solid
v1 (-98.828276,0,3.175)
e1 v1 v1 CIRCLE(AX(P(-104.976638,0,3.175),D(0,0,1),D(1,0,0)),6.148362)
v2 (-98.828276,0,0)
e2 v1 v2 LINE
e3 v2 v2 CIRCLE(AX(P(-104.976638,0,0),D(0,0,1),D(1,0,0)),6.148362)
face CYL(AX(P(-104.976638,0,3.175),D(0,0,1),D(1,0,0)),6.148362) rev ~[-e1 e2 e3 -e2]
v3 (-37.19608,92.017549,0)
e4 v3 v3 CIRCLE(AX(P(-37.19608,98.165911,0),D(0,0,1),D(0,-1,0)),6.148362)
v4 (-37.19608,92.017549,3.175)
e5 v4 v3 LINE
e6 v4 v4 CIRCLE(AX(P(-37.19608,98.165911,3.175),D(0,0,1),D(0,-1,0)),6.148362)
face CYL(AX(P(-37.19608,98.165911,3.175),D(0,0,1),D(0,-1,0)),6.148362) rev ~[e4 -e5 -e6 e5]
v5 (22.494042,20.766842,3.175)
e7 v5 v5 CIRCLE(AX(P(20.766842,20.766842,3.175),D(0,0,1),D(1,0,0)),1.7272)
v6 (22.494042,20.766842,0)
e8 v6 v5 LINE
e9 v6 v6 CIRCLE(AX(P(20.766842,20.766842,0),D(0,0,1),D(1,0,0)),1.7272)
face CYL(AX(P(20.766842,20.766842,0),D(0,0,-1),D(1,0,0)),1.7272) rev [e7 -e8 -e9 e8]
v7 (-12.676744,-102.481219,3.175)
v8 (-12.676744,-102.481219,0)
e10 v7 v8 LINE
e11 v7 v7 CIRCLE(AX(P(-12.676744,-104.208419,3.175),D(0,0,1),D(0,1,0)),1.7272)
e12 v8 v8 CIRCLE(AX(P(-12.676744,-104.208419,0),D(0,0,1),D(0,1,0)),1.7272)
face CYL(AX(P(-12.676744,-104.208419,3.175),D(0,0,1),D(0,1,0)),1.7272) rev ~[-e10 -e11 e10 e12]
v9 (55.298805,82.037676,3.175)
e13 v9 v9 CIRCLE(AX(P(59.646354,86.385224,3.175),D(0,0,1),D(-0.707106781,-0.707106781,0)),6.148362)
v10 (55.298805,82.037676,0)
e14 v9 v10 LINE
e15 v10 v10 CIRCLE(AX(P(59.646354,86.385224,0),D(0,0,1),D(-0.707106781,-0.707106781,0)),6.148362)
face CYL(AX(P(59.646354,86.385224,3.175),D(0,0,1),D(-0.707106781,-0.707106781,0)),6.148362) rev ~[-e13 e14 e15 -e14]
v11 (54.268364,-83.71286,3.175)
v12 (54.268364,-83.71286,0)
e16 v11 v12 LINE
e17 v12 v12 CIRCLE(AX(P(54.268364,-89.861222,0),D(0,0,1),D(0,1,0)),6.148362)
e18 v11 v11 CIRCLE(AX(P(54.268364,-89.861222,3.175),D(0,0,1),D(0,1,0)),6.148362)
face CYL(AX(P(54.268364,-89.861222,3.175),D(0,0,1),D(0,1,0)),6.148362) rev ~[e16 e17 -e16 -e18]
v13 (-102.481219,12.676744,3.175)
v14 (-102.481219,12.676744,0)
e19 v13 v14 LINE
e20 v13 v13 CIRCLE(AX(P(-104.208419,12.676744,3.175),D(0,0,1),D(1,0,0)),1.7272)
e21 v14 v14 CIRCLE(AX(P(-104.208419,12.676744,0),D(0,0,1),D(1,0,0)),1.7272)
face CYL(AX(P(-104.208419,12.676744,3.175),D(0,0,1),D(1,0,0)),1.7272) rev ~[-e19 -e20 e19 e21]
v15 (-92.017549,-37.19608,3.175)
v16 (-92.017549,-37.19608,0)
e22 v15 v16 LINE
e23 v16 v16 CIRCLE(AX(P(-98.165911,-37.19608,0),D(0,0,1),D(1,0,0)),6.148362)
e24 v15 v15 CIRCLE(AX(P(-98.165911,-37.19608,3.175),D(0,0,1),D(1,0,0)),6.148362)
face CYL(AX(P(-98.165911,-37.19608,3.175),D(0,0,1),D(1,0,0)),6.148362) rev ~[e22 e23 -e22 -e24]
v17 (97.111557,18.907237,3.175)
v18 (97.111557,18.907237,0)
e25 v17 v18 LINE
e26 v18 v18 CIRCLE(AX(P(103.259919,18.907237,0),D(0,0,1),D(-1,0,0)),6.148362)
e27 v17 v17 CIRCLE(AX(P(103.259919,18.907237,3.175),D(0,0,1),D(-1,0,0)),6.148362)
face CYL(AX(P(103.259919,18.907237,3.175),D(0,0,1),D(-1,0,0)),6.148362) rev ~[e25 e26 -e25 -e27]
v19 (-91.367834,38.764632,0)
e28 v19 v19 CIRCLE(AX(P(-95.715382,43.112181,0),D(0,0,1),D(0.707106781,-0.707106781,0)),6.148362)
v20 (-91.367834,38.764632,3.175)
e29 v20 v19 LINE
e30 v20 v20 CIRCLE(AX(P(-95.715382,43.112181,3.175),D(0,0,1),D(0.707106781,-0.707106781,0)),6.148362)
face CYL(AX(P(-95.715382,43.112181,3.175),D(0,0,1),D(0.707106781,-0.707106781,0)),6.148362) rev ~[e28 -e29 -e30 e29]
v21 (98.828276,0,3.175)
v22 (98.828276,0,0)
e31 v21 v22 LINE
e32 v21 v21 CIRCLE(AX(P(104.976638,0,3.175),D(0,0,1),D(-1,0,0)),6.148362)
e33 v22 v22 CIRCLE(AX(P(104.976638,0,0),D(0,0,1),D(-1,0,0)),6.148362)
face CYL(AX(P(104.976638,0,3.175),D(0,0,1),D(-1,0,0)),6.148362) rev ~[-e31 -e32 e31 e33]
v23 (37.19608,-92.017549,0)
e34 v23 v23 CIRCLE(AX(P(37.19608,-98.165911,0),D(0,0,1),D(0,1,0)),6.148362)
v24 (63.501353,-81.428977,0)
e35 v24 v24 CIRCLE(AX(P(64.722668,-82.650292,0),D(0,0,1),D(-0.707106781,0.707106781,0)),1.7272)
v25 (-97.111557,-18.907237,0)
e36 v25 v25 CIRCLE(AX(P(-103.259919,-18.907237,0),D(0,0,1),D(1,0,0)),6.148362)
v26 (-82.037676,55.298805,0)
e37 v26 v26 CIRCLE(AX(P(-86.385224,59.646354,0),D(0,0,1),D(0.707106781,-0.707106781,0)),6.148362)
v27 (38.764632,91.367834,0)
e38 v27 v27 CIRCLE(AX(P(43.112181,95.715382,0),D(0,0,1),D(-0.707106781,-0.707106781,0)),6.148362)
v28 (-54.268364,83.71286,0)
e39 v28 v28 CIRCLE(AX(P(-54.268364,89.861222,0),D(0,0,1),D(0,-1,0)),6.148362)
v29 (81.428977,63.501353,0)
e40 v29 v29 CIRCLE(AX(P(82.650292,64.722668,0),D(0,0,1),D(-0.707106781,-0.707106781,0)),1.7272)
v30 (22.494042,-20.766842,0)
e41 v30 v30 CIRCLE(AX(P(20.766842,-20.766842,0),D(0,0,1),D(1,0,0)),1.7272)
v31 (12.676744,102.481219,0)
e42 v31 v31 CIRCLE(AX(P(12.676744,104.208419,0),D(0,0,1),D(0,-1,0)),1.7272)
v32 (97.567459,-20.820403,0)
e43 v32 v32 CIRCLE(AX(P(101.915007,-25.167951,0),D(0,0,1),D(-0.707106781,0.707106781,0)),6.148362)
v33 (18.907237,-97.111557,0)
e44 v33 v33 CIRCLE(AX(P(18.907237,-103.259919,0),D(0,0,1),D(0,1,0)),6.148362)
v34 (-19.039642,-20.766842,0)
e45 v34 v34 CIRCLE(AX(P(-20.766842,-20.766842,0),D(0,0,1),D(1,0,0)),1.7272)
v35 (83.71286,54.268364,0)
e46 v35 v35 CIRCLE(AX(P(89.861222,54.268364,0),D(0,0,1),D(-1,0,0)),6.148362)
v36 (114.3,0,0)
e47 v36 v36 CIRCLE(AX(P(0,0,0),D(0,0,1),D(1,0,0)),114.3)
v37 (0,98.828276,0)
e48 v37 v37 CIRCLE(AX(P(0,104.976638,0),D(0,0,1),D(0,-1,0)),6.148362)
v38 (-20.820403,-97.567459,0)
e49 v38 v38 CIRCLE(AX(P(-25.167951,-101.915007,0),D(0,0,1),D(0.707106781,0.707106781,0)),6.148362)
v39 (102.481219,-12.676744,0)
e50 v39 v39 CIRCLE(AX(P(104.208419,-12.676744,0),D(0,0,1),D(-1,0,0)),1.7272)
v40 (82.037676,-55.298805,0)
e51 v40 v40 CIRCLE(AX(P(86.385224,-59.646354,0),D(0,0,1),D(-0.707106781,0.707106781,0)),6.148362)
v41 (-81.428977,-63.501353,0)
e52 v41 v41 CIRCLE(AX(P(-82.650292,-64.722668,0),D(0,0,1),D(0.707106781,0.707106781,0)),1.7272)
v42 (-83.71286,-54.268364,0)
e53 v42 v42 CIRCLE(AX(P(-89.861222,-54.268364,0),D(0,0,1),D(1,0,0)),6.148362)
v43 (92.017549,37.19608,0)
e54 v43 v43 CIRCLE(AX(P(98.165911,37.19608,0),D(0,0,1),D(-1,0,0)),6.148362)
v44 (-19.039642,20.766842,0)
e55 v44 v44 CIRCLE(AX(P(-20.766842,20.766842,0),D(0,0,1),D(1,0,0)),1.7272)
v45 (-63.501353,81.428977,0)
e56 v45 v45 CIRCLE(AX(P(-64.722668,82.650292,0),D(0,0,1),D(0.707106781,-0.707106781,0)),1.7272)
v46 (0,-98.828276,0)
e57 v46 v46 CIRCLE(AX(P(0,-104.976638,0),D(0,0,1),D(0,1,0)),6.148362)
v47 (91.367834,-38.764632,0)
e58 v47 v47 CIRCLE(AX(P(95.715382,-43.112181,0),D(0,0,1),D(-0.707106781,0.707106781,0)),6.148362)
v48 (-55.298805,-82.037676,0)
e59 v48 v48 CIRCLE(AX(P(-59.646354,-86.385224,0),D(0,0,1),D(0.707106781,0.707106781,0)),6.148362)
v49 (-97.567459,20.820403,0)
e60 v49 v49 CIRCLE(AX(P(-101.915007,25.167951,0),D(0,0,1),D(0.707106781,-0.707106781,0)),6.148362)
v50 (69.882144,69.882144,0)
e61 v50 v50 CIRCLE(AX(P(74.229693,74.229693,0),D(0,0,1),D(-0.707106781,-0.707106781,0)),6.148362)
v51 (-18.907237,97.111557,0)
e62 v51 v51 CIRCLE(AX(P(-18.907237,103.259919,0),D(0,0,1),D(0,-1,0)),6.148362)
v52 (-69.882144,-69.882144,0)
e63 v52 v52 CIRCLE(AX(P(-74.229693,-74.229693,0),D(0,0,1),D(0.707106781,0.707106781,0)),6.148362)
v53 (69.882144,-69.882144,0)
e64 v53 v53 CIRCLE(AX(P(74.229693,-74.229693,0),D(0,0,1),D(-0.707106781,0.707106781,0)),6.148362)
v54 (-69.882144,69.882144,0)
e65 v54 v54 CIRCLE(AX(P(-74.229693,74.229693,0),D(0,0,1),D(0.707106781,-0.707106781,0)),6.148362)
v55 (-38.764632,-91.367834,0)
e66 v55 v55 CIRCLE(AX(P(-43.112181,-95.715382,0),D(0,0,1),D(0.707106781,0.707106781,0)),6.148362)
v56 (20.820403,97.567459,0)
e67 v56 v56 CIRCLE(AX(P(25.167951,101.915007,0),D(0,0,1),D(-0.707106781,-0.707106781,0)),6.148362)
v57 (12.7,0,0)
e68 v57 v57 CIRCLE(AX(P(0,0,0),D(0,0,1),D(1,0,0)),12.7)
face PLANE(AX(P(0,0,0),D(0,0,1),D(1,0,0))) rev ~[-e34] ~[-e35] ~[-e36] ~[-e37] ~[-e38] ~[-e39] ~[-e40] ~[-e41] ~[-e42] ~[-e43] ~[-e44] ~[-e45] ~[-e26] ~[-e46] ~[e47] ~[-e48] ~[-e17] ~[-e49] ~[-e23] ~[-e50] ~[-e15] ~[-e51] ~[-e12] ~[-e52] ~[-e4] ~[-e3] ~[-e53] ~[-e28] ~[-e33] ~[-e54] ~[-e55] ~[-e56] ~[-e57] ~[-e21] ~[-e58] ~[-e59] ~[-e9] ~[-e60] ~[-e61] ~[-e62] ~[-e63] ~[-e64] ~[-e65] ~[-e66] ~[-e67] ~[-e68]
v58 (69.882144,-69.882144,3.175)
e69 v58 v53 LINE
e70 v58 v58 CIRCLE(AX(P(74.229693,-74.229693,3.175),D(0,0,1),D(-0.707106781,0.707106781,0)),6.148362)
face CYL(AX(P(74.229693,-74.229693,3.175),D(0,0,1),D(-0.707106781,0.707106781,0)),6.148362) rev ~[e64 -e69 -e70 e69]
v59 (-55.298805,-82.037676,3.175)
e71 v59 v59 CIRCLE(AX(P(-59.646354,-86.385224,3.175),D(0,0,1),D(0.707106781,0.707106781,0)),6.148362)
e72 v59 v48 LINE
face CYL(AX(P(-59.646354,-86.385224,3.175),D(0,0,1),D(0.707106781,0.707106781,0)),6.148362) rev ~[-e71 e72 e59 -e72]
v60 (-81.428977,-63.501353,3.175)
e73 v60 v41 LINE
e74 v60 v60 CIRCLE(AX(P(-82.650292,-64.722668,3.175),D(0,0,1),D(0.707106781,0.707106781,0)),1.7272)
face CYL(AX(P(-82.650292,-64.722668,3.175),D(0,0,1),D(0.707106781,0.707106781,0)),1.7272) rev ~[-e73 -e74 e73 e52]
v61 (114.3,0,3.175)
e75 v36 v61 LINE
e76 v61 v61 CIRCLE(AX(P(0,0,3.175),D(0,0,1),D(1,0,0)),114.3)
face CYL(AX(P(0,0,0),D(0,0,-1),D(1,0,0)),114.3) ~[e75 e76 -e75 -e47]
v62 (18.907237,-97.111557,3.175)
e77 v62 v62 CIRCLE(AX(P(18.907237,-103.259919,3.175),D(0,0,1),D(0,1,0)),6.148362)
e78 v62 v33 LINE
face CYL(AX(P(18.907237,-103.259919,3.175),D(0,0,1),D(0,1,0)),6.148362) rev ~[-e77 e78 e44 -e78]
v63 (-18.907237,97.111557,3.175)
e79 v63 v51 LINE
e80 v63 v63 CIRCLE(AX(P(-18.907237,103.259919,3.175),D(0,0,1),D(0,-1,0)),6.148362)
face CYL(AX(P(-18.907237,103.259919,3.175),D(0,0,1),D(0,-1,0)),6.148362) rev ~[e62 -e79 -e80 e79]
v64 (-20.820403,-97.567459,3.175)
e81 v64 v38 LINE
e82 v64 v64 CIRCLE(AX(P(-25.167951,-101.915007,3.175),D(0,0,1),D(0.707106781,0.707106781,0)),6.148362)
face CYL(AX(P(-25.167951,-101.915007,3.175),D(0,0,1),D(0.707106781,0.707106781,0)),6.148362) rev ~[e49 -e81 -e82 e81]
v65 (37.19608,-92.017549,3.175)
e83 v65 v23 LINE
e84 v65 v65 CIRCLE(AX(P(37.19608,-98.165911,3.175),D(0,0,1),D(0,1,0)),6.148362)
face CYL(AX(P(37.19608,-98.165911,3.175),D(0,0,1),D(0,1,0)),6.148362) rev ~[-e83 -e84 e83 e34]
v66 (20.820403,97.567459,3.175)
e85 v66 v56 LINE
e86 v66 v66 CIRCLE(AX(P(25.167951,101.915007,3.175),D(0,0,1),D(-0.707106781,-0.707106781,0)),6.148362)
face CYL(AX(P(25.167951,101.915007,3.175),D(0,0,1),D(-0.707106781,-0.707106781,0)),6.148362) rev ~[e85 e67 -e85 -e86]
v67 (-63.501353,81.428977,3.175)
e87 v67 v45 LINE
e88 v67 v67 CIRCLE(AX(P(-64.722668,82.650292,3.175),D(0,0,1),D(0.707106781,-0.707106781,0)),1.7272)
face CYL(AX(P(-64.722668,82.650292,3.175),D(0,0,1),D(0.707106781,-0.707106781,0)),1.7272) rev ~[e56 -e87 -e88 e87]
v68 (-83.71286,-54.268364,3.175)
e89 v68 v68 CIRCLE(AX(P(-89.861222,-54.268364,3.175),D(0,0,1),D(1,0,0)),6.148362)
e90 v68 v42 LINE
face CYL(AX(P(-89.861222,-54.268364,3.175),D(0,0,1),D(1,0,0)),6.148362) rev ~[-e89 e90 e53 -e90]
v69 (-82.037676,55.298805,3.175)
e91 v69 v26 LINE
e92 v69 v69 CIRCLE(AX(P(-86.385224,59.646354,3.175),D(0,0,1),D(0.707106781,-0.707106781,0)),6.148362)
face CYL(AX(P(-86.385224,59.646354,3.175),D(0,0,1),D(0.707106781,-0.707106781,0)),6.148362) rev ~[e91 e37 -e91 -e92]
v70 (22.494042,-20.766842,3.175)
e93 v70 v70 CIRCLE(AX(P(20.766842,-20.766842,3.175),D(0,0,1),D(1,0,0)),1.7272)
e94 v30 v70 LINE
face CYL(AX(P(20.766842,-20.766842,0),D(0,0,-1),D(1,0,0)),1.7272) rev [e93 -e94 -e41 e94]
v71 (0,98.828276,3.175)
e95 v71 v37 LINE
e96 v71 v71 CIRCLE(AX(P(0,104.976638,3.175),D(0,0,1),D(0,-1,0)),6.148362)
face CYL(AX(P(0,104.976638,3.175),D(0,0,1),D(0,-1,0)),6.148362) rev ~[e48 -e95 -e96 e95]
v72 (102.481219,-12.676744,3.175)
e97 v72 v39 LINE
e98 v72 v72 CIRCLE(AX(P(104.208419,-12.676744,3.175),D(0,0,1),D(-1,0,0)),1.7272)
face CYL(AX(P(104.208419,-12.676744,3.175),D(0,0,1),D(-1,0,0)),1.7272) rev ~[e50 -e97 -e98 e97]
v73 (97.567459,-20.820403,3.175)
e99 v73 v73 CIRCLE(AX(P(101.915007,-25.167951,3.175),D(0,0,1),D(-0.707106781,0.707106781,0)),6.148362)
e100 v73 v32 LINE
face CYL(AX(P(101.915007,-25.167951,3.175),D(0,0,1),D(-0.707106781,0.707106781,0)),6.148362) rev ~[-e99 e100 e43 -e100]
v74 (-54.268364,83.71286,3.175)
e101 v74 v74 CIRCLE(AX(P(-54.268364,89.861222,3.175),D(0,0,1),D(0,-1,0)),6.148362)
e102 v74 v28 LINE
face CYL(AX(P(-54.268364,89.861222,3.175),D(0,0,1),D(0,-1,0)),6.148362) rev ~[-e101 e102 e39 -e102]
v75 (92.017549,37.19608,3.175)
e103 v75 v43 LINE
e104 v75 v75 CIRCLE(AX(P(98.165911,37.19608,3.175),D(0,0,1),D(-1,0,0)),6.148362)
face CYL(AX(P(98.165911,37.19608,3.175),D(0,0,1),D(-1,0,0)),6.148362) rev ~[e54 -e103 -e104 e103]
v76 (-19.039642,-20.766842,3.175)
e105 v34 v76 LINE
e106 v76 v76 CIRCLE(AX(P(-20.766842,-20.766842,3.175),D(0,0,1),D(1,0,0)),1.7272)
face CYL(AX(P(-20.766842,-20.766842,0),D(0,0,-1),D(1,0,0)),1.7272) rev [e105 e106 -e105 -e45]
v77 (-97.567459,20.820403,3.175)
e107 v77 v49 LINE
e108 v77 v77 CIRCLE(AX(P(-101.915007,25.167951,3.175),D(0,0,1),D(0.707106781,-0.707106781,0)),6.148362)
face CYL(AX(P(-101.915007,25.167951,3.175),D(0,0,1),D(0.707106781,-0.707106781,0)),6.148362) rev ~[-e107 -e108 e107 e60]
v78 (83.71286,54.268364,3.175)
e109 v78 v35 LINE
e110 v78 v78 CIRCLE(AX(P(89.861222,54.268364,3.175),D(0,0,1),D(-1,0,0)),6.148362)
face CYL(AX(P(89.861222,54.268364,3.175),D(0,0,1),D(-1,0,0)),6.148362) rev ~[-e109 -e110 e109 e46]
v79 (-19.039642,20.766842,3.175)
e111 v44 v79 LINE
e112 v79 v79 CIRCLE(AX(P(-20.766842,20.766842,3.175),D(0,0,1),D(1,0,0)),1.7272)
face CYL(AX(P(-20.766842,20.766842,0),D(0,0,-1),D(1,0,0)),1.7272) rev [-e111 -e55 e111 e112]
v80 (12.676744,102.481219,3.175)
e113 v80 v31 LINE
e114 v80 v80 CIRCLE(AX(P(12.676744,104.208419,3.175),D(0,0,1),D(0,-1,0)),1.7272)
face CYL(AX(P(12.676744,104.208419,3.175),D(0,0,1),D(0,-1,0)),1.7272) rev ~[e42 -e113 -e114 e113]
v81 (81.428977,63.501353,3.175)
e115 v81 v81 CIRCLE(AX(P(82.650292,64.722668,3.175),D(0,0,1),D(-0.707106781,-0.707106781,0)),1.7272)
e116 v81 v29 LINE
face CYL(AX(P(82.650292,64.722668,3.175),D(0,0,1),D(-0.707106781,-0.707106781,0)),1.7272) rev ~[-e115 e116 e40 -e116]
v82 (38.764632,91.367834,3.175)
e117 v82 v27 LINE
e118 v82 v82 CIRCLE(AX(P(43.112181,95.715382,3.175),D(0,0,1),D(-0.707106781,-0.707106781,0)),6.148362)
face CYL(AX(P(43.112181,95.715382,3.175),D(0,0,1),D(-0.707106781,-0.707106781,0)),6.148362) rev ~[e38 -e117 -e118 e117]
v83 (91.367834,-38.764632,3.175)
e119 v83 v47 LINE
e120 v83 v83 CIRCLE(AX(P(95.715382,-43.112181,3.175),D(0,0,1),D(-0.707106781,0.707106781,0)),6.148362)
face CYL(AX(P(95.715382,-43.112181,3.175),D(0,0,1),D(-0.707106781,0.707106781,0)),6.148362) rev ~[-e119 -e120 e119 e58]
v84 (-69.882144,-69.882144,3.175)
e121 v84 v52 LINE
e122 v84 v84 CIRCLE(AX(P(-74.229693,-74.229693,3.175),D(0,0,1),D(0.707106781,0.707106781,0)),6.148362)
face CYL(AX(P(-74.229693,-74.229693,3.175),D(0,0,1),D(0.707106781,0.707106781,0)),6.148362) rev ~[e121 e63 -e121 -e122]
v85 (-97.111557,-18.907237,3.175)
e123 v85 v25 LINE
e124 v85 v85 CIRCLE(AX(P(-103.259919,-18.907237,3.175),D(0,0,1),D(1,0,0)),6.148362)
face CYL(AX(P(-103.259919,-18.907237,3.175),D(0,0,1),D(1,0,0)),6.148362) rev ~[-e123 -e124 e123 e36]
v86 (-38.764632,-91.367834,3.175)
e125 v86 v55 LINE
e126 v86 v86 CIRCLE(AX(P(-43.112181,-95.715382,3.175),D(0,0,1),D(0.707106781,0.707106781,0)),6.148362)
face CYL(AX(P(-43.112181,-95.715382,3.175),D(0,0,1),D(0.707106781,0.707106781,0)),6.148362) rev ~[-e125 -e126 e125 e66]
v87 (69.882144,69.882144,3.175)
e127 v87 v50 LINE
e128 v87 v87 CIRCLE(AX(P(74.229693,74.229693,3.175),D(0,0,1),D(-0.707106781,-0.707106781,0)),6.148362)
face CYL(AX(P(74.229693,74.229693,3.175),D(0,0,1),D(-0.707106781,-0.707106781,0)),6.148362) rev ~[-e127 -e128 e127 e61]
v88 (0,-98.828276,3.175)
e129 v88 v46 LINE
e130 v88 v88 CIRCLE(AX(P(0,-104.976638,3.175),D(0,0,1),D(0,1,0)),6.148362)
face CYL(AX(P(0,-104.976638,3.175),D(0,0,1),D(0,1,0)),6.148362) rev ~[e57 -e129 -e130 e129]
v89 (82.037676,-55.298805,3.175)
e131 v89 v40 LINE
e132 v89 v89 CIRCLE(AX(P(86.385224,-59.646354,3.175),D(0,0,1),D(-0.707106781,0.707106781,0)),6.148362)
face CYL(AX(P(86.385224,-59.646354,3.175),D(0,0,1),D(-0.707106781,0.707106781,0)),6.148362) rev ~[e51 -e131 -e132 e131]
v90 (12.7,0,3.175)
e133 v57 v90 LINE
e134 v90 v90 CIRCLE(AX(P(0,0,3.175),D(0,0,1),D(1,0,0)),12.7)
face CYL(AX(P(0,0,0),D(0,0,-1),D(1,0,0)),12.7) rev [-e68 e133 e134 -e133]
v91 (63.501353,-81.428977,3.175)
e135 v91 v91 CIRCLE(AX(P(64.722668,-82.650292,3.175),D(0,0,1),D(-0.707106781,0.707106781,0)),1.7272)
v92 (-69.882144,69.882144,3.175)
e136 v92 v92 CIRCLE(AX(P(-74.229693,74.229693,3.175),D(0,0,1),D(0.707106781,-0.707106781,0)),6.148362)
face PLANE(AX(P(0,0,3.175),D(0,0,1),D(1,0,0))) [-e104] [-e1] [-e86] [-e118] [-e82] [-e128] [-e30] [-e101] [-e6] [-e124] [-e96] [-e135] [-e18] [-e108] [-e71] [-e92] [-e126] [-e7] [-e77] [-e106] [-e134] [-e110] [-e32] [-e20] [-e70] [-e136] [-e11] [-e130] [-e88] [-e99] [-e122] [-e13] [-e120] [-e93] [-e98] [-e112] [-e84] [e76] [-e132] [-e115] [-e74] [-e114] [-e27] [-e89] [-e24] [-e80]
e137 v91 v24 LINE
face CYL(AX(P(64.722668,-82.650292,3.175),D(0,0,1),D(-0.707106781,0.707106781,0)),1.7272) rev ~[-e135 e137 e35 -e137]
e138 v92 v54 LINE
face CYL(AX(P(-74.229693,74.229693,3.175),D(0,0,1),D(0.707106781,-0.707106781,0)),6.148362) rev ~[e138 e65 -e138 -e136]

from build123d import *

# Parameters (mm, degrees)
F0_R            = 114.3
F0_R_2          = 1.7272
F0_R_3          = 12.7
F1_DEPTH        = 3.175
F2_R            = 6.1483621
F2_R_2          = 1.7272
F3_DEPTH        = 3.175
F3_COPIES_COUNT = 8


# Not quite as in the source:
# - a pattern or mirror of a feature is missing from the dataset's text; its kind, count and spacing are read off the source's solid


with BuildPart() as f1:
    # F0 (on Top) → F1 (new body)
    with BuildSketch(Plane.XY):
        Circle(F0_R)
        with Locations((-20.76684228, -20.76684228)):
            Circle(F0_R_2, mode=Mode.SUBTRACT)
        with Locations((20.76684228, -20.76684228)):
            Circle(F0_R_2, mode=Mode.SUBTRACT)
        with Locations((-20.76684228, 20.76684228)):
            Circle(F0_R_2, mode=Mode.SUBTRACT)
        Circle(F0_R_3, mode=Mode.SUBTRACT)
        with Locations((20.76684228, 20.76684228)):
            Circle(F0_R_2, mode=Mode.SUBTRACT)
    extrude(amount=F1_DEPTH)

    # F2 (on face) → F3 (cut, through all)
    with BuildSketch(Plane.XY.offset(3.175)):
        with Locations((-104.9766379, 0)):
            Circle(F2_R)
        with Locations((-103.2599191691, -18.9072366561)):
            Circle(F2_R)
        with Locations((-98.1659111494, -37.1960803446)):
            Circle(F2_R)
        with Locations((-89.8612219386, -54.2683636799)):
            Circle(F2_R)
        with Locations((-104.2084193553, 12.676744072)):
            Circle(F2_R_2)
    f3 = extrude(amount=-F3_DEPTH, mode=Mode.SUBTRACT)

    # F3_copies: F3 ×8 about axis
    f3_copies_axis = Axis((0, 0, 0), (0, 0, 1))
    for i in range(1, F3_COPIES_COUNT):
        add(f3.rotate(f3_copies_axis, i * 360 / F3_COPIES_COUNT), mode=Mode.SUBTRACT)


solid = f1.part
